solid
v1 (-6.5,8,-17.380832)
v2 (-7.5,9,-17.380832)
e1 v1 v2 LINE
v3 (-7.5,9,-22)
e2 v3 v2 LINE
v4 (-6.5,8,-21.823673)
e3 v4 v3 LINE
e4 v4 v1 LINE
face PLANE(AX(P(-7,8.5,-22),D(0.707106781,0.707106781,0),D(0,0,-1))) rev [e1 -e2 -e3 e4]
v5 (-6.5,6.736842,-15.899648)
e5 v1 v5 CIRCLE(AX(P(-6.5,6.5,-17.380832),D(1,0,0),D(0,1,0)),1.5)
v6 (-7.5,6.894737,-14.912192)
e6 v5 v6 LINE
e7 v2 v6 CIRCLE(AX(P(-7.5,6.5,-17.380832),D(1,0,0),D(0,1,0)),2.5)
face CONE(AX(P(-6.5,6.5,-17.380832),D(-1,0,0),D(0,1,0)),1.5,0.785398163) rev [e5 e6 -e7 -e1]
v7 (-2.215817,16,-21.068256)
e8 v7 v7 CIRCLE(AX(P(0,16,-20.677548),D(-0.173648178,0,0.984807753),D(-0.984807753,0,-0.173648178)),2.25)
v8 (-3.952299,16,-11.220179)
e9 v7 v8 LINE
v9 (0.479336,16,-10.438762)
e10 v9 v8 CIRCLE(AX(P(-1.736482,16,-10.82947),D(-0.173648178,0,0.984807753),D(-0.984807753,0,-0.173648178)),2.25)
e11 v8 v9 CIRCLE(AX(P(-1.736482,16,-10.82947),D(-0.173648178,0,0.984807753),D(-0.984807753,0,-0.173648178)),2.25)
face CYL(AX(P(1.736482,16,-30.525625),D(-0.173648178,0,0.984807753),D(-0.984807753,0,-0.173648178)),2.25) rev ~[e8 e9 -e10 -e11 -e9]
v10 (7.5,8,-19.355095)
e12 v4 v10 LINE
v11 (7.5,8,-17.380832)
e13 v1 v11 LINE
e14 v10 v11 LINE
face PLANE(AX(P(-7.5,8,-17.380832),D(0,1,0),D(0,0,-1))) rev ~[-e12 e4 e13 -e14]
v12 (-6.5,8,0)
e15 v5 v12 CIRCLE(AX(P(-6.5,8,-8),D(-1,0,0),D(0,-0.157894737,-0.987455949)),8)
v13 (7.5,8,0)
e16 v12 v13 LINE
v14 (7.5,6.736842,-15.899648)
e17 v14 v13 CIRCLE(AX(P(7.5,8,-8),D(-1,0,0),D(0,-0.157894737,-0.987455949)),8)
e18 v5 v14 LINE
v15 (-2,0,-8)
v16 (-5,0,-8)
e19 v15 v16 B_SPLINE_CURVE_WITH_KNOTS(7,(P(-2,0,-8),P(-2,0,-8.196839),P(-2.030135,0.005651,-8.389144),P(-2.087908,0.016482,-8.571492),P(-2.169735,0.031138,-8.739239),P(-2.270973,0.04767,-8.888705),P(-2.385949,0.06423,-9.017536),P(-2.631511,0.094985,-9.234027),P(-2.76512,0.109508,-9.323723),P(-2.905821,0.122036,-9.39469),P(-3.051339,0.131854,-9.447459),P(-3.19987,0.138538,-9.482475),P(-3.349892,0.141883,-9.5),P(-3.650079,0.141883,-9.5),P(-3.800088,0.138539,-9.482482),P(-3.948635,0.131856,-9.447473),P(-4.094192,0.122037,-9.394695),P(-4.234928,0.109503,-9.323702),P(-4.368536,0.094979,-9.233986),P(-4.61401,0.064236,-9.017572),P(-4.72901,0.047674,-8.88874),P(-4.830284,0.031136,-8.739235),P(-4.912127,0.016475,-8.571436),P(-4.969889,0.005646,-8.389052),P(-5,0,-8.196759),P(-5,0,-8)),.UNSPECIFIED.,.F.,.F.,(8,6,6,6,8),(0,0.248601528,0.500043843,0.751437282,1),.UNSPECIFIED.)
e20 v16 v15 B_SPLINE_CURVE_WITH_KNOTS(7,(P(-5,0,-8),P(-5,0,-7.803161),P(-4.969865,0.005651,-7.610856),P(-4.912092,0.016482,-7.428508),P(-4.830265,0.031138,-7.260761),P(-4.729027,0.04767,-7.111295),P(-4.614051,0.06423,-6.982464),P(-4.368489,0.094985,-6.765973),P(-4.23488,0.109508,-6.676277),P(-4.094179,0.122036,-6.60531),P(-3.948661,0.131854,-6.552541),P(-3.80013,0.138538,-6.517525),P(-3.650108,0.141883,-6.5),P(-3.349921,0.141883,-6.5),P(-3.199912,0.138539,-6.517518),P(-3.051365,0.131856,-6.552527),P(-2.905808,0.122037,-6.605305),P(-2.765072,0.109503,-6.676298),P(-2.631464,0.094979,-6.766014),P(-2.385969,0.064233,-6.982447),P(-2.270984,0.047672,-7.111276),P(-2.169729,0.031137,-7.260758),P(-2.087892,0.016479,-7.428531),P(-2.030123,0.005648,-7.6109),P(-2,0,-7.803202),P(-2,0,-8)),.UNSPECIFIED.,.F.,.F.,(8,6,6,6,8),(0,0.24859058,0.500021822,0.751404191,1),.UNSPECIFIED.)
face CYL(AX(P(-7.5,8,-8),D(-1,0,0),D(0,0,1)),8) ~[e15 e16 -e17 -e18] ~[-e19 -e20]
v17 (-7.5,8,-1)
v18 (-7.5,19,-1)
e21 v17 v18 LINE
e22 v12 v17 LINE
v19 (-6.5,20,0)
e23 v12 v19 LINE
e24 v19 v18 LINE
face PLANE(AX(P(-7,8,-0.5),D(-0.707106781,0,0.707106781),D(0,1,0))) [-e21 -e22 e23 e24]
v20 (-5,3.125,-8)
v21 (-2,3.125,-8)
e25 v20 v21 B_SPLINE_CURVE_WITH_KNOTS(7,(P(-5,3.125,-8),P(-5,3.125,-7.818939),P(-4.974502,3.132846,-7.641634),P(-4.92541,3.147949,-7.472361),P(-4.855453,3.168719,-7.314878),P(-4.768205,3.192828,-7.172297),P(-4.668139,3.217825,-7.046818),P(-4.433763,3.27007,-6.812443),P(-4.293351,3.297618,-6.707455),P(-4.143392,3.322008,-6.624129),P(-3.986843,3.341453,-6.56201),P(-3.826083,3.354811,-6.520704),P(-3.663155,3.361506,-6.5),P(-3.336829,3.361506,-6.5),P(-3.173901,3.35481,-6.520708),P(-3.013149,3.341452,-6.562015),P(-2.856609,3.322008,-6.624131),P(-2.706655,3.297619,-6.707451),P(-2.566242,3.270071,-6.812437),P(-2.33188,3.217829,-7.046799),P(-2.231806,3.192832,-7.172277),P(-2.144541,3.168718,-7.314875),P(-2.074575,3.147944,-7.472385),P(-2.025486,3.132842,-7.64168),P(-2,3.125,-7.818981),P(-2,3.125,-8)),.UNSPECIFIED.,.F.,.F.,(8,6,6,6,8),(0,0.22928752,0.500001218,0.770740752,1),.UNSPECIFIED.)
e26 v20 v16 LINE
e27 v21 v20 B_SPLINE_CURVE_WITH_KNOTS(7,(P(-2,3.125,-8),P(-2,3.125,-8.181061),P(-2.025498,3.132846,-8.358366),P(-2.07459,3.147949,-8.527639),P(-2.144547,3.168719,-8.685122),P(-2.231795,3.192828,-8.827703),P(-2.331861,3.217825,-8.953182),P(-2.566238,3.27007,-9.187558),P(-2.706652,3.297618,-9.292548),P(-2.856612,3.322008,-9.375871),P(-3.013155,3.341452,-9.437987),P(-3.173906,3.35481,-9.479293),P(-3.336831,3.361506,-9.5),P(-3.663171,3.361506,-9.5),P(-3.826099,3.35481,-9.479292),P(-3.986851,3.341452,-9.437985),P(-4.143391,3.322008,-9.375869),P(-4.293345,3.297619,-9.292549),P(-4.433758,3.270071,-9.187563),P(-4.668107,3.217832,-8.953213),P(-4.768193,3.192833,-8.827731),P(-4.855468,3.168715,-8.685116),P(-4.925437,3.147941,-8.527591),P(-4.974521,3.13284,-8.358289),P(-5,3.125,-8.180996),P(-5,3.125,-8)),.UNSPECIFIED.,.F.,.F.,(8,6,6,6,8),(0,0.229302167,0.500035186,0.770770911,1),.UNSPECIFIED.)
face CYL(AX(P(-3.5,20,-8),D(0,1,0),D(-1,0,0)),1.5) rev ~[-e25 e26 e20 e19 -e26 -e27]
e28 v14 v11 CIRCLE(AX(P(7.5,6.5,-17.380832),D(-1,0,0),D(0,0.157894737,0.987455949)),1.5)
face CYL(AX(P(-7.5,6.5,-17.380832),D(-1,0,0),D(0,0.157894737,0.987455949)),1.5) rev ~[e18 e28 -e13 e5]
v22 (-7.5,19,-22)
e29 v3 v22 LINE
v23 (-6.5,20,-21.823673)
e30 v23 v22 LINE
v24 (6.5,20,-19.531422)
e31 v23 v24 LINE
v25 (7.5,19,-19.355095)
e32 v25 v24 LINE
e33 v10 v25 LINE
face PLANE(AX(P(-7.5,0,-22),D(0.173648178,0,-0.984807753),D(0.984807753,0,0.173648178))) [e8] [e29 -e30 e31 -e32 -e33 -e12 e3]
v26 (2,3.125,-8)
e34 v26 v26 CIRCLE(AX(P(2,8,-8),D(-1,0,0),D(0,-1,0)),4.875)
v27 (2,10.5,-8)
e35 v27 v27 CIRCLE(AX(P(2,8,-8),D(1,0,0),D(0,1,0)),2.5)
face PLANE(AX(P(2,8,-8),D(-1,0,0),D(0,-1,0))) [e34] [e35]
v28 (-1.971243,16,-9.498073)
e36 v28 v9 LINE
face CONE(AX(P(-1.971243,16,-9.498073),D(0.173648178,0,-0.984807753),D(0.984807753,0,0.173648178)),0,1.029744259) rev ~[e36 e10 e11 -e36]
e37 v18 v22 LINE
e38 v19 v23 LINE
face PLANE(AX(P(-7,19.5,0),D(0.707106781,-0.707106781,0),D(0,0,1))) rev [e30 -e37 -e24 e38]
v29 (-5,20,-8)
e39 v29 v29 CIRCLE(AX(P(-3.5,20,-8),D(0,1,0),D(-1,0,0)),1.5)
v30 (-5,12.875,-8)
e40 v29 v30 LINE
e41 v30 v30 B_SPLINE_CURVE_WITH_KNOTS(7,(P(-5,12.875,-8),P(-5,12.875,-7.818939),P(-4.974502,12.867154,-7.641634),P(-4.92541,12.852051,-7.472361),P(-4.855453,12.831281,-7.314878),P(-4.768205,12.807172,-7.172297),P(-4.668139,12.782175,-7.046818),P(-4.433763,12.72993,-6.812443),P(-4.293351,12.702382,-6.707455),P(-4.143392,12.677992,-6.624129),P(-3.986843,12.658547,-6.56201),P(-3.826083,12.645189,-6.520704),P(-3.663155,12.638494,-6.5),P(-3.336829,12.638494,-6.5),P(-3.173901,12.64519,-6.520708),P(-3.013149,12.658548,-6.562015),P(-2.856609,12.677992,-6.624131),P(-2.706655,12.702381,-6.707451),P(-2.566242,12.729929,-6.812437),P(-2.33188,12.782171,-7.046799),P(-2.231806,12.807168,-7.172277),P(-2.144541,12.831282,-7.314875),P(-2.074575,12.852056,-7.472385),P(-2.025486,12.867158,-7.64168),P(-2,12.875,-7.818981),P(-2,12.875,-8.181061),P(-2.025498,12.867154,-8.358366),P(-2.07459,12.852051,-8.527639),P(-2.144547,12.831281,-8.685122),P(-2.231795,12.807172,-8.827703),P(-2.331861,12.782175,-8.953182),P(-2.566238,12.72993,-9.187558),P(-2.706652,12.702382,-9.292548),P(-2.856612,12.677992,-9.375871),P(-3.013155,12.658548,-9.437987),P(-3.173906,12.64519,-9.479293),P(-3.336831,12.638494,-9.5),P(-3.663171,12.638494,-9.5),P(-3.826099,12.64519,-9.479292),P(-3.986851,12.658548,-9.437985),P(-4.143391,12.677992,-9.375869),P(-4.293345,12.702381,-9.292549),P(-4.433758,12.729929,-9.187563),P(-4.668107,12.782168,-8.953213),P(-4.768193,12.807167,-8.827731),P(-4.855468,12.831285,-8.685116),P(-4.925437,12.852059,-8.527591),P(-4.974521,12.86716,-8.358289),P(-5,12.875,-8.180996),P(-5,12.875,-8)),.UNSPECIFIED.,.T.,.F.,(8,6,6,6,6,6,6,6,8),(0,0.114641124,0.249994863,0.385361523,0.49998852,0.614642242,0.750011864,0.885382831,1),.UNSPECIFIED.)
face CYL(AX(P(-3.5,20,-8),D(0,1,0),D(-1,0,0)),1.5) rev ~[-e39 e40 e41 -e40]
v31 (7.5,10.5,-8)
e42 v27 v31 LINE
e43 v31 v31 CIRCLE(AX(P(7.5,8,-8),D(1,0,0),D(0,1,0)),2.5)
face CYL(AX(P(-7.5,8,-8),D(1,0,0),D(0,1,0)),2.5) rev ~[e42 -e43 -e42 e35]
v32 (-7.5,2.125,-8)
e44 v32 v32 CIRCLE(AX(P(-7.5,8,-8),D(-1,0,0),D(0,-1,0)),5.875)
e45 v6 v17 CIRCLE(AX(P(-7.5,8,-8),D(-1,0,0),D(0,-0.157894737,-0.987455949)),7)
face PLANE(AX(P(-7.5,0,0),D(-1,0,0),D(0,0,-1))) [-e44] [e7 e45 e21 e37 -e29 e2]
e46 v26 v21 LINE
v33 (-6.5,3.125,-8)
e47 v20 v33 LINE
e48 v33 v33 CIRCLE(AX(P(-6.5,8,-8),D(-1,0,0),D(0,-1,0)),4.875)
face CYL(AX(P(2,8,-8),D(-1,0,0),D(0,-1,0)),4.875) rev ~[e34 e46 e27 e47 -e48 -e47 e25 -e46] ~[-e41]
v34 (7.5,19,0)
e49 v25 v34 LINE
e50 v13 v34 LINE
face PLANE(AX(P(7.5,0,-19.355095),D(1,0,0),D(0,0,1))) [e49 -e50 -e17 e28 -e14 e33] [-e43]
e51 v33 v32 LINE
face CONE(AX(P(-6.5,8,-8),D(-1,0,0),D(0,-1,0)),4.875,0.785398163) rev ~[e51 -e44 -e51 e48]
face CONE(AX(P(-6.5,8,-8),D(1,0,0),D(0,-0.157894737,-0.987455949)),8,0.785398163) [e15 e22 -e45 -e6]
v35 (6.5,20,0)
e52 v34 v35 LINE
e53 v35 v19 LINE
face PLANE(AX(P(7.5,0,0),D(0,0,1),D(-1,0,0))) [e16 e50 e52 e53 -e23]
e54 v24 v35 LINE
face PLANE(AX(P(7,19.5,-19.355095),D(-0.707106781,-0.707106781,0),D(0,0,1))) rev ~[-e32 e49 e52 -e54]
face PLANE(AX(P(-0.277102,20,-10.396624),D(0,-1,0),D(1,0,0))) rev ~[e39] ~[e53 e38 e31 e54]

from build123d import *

# Parameters (mm, degrees)
F1_DEPTH       = 20
F3_D           = 5
F3_CBORE_D     = 9.75
F3_CBORE_DEPTH = 9.5
F5_D           = 4.5
F5_DEPTH       = 10
F5_TIP         = 1.3519363928
F6_R           = 1.5
F7_DEPTH       = 25
F9_DEPTH       = 15.001
F10_SIZE       = 1


with BuildPart() as f1:
    # F0 (on Front) → F1 (new body)
    with BuildSketch(Plane.XZ):
        Polygon((7.5, 0), (-7.5, 0), (-7.5, -22), (7.5, -19.3550952894), align=None)
    extrude(amount=-F1_DEPTH)

    # F3 (through all)
    with Locations(Plane(origin=(-7.5, 0, 0), x_dir=(0, -1, 0), z_dir=(-1, 0, 0))):
        with Locations((-8, -8)):
            CounterBoreHole(F3_D / 2, F3_CBORE_D / 2, F3_CBORE_DEPTH)

    # F5
    with Locations(Plane(origin=(3.5360689045, 0, -20.0540432912), x_dir=(0.984807753, 0, 0.1736481777), z_dir=(0.1736481777, 0, -0.984807753))):
        with Locations((-3.5906184671, -16)):
            Hole(F5_D / 2, depth=F5_DEPTH)
            with Locations((0, 0, -(F5_DEPTH + F5_TIP / 2))):  # 118° drill point
                Cone(0, F5_D / 2, F5_TIP, mode=Mode.SUBTRACT)

    # F6 (on face) → F7 (cut)
    with BuildSketch(Plane(origin=(0, 20, 0), x_dir=(-1, 0, 0), z_dir=(0, 1, 0))):
        with Locations((3.5, -8)):
            Circle(F6_R)
    extrude(amount=-F7_DEPTH, mode=Mode.SUBTRACT)

    # F8 (on face) → F9 (cut, through all)
    with BuildSketch(Plane(origin=(-7.5, 0, 0), x_dir=(0, -1, 0), z_dir=(-1, 0, 0))):
        with BuildLine():
            Line((0, 0), (-8, 0))
            ThreePointArc((-8, 0), (-2.3431457505, -2.3431457505), (0, -8))
            Line((0, -8), (0, 0))
        make_face()
        with BuildLine():
            Line((-8, -17.3808315196), (-8, -22))
            Line((-8, -22), (0, -22))
            Line((0, -22), (0, -8))
            ThreePointArc((0, -8), (-1.912912718, -13.1910854762), (-6.7368421053, -15.8996475955))
            ThreePointArc((-6.7368421053, -15.8996475955), (-7.6413288654, -16.4075029929), (-8, -17.3808315196))
        make_face()
    extrude(amount=-F9_DEPTH, mode=Mode.SUBTRACT)

    # F10
    f10_edges = [f1.edges().sort_by_distance(p)[0] for p in [
        (7.5, 20, -9.677548),
        (-7.5, 20, -11),
        (-7.5, 14, 0),
        (-7.5, 8, -19.690416),
        (-7.5, 12.875, -8),
        (-7.5, 7.641329, -16.407503),
        (-7.5, 0.025128, -7.366431),
    ]]
    chamfer(f10_edges, length=F10_SIZE)


solid = f1.part
